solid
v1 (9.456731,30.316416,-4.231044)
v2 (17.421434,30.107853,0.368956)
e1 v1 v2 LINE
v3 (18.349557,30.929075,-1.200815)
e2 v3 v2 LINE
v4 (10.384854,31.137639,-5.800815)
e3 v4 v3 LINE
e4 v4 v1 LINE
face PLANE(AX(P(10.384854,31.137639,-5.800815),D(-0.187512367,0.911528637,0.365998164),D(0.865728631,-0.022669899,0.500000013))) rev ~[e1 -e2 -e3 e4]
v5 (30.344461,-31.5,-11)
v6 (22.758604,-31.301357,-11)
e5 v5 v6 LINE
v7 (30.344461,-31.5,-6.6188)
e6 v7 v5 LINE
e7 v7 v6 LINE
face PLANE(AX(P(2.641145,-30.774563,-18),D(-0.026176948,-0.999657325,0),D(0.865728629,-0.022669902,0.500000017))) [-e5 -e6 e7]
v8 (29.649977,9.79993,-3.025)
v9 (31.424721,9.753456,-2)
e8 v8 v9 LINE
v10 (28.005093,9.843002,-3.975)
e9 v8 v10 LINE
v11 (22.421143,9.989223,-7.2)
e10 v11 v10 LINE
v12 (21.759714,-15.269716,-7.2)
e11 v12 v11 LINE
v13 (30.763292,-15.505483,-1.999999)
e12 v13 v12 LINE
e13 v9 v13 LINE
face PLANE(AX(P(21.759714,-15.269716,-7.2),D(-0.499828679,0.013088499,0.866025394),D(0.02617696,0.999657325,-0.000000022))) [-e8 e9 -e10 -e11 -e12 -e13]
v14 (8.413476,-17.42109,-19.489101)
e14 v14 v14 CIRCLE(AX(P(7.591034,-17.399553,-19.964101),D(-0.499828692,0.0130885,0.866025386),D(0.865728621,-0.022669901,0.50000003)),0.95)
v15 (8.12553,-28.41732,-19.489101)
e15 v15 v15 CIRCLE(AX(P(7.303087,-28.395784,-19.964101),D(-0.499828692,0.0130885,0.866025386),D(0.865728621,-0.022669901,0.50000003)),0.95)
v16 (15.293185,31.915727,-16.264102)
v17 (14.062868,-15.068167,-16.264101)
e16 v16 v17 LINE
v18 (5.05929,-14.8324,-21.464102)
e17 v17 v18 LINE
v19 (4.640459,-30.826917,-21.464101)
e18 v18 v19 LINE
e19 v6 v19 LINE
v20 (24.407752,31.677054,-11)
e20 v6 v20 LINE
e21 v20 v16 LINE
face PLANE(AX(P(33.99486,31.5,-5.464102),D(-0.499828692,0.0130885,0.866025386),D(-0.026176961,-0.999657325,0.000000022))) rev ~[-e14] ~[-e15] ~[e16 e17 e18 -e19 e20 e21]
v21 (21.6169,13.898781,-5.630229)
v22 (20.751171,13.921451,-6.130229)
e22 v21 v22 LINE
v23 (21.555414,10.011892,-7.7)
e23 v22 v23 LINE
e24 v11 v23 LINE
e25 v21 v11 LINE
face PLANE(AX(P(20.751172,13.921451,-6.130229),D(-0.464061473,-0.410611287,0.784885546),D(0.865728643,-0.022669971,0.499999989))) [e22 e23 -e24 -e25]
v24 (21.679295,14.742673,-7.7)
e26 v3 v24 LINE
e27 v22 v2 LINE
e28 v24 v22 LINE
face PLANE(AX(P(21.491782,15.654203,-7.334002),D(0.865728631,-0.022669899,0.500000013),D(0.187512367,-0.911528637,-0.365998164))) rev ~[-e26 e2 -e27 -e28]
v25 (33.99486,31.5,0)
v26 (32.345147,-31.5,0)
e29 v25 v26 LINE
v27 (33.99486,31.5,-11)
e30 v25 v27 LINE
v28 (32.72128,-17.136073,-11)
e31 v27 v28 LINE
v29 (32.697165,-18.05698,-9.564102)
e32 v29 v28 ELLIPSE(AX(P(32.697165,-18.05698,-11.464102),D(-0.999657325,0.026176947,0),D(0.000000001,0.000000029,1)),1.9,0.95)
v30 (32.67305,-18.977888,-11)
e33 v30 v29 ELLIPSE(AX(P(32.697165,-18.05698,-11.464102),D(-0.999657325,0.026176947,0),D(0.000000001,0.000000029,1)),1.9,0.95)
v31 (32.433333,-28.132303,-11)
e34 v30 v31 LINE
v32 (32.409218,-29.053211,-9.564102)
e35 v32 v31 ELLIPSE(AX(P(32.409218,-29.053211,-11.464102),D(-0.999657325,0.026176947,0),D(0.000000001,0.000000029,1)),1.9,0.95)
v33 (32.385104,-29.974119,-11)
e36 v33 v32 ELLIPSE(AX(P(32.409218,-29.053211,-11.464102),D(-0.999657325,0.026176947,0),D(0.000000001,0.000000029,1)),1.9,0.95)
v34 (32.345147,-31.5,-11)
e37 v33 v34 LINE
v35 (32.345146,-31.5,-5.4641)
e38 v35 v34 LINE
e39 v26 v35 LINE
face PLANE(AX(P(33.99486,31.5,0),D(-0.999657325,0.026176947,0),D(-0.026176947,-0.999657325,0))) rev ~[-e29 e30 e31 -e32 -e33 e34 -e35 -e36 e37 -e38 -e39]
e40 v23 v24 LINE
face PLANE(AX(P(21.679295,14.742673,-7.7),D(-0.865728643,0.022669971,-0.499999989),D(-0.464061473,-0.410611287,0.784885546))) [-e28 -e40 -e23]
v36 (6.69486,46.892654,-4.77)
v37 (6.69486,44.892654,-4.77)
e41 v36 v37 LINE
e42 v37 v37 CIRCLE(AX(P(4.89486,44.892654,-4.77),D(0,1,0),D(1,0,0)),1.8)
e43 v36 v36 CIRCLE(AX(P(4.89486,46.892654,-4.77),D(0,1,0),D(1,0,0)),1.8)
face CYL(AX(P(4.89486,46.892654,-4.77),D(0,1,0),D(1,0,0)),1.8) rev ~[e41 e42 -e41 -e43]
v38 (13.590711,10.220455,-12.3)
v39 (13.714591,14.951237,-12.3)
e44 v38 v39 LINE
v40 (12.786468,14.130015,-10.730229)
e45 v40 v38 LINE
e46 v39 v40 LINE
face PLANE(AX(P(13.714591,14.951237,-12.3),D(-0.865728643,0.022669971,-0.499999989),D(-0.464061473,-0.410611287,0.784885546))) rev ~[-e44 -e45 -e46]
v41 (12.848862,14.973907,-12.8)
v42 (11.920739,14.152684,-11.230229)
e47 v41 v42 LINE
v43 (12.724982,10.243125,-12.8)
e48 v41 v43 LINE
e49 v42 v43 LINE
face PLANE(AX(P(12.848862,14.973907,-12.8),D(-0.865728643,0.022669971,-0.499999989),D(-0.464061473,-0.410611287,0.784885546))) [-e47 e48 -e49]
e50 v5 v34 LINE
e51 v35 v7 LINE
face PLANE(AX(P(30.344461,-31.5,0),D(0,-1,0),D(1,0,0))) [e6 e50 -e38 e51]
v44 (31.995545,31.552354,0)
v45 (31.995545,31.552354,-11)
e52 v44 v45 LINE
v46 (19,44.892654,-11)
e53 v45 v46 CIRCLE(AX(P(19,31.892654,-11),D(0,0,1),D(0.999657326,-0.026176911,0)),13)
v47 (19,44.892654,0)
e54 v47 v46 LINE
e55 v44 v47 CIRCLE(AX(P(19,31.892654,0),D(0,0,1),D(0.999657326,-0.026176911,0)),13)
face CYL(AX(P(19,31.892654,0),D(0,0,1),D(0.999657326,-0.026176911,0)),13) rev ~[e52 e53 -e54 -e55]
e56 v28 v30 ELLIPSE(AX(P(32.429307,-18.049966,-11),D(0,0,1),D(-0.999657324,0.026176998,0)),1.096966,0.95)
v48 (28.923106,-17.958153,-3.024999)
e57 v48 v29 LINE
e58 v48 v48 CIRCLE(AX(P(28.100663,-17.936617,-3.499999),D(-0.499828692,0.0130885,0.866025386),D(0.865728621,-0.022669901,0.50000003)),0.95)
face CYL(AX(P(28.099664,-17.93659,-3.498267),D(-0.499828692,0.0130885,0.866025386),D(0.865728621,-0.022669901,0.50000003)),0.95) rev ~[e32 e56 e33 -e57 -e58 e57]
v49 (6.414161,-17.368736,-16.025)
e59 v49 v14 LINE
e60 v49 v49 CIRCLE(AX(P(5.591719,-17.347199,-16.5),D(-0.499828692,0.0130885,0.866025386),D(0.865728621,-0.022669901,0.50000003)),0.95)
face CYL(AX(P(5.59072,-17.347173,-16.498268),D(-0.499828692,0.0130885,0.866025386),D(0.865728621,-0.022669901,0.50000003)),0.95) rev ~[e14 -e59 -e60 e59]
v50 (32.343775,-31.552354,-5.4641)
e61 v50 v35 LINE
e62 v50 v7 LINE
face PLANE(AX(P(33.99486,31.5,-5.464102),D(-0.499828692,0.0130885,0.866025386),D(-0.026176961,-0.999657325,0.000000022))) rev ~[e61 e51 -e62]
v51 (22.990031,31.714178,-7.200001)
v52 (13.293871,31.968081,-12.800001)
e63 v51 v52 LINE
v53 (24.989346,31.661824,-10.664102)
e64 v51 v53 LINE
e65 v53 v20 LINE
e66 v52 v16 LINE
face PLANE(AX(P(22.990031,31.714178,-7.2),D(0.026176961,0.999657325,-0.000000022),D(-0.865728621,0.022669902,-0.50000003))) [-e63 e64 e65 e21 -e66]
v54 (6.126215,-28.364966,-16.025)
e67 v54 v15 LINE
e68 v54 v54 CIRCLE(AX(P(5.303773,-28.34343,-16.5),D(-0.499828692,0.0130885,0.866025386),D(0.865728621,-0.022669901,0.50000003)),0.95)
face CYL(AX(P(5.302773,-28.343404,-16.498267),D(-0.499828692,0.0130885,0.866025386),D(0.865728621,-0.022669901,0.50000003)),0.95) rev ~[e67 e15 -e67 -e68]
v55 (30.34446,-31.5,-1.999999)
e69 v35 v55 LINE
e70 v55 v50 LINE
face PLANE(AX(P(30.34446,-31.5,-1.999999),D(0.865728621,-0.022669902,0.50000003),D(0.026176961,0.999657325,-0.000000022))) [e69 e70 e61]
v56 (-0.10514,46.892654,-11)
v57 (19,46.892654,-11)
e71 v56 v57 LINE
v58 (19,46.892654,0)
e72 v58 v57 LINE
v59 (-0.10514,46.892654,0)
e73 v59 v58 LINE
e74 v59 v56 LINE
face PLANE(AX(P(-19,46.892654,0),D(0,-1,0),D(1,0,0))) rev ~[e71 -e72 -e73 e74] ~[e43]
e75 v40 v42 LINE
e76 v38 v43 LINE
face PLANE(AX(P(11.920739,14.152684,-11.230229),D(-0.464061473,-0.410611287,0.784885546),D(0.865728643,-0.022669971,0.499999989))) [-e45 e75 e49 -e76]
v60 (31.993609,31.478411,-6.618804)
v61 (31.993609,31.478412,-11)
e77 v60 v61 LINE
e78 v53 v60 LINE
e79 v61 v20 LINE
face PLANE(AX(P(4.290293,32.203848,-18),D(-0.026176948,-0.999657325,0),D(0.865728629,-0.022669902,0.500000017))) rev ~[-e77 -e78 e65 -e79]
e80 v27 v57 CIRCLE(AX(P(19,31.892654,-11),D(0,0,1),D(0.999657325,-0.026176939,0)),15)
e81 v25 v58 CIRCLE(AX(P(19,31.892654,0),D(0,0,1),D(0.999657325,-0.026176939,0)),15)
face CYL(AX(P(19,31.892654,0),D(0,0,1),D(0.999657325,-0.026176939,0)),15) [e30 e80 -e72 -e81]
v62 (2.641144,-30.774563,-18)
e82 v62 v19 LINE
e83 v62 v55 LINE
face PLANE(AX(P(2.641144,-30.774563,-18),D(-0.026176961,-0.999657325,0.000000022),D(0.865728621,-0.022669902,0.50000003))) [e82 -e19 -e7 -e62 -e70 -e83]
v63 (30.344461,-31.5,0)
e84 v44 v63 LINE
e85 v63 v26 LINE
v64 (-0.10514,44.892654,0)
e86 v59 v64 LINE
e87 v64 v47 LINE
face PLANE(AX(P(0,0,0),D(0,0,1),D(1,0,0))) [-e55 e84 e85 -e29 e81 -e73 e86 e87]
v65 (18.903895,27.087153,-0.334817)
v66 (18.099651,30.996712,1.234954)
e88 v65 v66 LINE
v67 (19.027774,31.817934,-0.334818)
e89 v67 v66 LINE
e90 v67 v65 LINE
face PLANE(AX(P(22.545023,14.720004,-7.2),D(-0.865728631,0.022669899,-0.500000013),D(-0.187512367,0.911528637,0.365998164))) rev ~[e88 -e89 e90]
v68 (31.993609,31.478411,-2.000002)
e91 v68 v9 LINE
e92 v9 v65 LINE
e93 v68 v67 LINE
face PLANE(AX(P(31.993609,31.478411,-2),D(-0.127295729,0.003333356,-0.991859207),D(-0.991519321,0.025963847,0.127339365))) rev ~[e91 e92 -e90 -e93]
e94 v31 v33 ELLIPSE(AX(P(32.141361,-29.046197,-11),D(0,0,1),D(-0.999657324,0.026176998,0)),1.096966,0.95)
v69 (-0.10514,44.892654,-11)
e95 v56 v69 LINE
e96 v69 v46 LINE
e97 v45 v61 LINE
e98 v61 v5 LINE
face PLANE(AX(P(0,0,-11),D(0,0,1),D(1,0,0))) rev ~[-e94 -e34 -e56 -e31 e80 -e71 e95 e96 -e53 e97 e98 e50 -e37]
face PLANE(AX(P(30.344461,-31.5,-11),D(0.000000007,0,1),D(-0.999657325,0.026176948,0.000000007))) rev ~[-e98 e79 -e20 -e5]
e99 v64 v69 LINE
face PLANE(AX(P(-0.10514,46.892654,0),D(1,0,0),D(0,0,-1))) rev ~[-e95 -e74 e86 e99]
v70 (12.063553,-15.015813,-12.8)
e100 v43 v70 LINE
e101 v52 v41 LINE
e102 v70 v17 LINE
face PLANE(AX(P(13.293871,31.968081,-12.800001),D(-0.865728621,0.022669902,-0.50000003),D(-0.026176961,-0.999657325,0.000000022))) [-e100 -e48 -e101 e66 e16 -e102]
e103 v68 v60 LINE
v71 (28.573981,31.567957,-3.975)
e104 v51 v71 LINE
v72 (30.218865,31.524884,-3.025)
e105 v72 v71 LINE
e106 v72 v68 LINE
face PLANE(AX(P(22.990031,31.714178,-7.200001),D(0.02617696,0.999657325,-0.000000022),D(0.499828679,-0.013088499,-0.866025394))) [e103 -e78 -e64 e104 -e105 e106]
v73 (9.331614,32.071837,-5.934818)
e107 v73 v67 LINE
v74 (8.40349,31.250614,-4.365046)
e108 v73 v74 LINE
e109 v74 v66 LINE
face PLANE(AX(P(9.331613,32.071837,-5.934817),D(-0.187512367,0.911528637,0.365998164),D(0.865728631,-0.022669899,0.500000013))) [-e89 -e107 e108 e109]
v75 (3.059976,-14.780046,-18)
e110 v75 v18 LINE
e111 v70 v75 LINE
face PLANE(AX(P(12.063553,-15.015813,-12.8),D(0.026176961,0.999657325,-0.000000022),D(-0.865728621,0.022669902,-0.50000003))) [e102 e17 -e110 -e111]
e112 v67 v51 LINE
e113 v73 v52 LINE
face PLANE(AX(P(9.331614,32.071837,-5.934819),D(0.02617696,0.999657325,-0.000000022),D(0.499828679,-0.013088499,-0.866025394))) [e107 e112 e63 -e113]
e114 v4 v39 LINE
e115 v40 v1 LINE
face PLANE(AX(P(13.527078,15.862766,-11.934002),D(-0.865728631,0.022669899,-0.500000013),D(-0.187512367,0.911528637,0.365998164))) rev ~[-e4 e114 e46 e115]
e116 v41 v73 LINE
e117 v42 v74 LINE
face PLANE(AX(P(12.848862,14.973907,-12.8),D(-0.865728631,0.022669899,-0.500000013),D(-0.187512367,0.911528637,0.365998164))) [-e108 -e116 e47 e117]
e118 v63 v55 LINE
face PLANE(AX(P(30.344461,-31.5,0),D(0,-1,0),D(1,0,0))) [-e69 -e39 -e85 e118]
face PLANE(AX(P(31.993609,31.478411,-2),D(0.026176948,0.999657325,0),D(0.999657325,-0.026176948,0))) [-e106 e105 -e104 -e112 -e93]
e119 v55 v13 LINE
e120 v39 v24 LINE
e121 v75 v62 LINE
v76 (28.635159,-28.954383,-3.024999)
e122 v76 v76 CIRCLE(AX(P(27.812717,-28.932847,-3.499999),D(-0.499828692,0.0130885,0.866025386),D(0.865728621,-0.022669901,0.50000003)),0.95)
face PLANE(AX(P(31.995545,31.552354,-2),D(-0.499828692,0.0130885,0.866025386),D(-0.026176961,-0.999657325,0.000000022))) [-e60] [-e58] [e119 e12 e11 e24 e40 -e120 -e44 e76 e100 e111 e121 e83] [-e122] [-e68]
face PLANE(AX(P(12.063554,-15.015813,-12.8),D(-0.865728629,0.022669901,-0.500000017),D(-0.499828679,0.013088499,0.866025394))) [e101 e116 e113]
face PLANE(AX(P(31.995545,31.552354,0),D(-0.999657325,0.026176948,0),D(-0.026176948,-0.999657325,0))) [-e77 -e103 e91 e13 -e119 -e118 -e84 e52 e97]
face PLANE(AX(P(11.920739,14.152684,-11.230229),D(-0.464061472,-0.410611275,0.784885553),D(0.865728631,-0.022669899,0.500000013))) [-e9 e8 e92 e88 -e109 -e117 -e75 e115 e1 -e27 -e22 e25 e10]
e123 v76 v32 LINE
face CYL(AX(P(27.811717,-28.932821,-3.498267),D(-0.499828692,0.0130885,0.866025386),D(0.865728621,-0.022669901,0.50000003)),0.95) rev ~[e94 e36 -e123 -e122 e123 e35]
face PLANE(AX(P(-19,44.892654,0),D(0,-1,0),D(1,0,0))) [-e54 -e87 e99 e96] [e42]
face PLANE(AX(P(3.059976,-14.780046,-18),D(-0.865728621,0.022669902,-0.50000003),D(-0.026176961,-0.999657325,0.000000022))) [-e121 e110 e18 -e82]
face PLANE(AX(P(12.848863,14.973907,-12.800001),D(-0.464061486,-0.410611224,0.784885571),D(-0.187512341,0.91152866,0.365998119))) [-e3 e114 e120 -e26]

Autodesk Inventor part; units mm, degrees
ref_plane "YZ Plane" through (0, 0, 0) normal (1, 0, 0) x (0, 1, 0)
ref_plane "XZ Plane" through (0, 0, 0) normal (0, 1, 0) x (-1, 0, 0)
sketch "Sketch1" plane through (0, 0, 0) normal (0, 0, 1) x (1, 0, 0)
  line L0 (-19, 46.892654) -> (19, 46.892654)
  line L1 (33.99486, 31.5) -> (32.345147, -31.5)
  arc A0 (33.99486, 31.5) -> (19, 46.892654) centre (19, 31.892654) ccw
  line L2 (-19, 44.892654) -> (19, 44.892654)
  arc A1 (31.995545, 31.552354) -> (19, 44.892654) centre (19, 31.892654) ccw
  line L3 (31.995545, 31.552354) -> (30.344461, -31.5)
  line L4 (-19, 46.892654) -> (-19, 44.892654)
  line L5 (30.344461, -31.5) -> (32.345147, -31.5)
  point P0 (0, 0)
  point P1 (33.170003, 0)
  point P2 (0, 46.892654)
  dimension "d0" = 88.5
  dimension "d1" = 15
  dimension "d2" = 38
  dimension "d3" = 63
  dimension "d4" = 2
extrude "Extrusion1" add sketch "Sketch1" against normal blind 11
sketch "Sketch3" plane through (-19, 44.892654, 0) normal (0, -1, 0) x (1, 0, 0)
  line L0 (0, 0) -> (13, 0)
  line L1 (13, 0) -> (13, -14.7)
  line L2 (13, -14.7) -> (0, -14.7)
  line L3 (0, -14.7) -> (0, 0)
  line L4 (0, 0) -> (38, 0) projected
  line L5 (0, 0) -> (0, -11) projected
  point P0 (19, 0)
  dimension "d7" = 13
  dimension "d8" = 14.7
extrude "Extrusion2" [suppressed]
extrude "Extrusion3" [suppressed]
sketch "Sketch5" plane through (-19, 42.692654, 0) normal (0, -1, 0) x (1, 0, 0)
  line L0 (0, 0) -> (6.5, 0) construction
  line L1 (6.5, 0) -> (6.5, -4.77) construction
  line L2 (6.5, -4.77) -> (0, -4.77) construction
  line L3 (0, -4.77) -> (0, 0) construction
  line L4 (13, 0) -> (0, 0) construction
  line L5 (0, 0) -> (0, -14.7) construction
  circle A0 centre (6.5, -4.77) radius 1.8
  circle A1 centre (6.5, -4.77) radius 3.5
  point P0 (19, 0)
  dimension "d15" = 4.77
  dimension "d16" = 6.5
  dimension "d17" = 3.6
  dimension "d18" = 7
extrude "Extrusion7" [suppressed]
extrude "Extrusion8" [suppressed]
sketch "Sketch7" plane through (-19, 42.692654, 0) normal (-1, 0, 0) x (0, 0, 1)
  line L0 (-6.57, 3) -> (-2.97, 3) projected
  line L1 (-6.57, 5.2) -> (-2.97, 5.2) projected
  line L2 (-6.57, 5.2) -> (-12.7, 5.2)
  line L3 (-12.7, 5.2) -> (-12.7, 1.7)
  line L4 (-12.7, 1.7) -> (-6.57, 1.7)
  line L5 (-6.57, 1.7) -> (-6.57, 5.2)
  line L6 (0, 5.2) -> (-14.7, 5.2) projected
  line L7 (-14.7, 5.2) -> (-14.7, 0) projected
  point P0 (0, -42.692654)
  point P1 (-12.7, 3.45)
  dimension "d31" = 3.5
  dimension "d32" = 2
extrude "Extrusion9" [suppressed]
sketch "Sketch8" plane through (-19, 46.892654, 0) normal (0, 1, 0) x (1, 0, 0)
  line L0 (38, 11) -> (0, 11) projected
  line L1 (13, 11) -> (18, 11)
  line L2 (18, 11) -> (18, 6.57)
  line L3 (18, 6.57) -> (13, 6.57)
  line L4 (13, 6.57) -> (13, 11)
  line L5 (13, 6.57) -> (6.5, 6.57) projected
  point P0 (19, 0)
  dimension "d35" = 5
extrude "Extrusion10" [suppressed]
chamfer "Chamfer1" [suppressed]
sketch "Sketch9" plane through (31.995545, 31.552354, -11) normal (-0.9996573, 0.0261769, 0) x (0, 0, 1)
  line L0 (9, 0) -> (9, -63.073968)
  line L1 (11, -63.073968) -> (0, -63.073968)
  line L2 (11, 0) -> (0, 0)
  line L3 (11, 0) -> (11, -63.073968)
  point P0 (11, -32.379087)
  dimension "d41" = 2
ref_plane "Work Plane1" through (31.995545, 31.552354, -2) normal (-0.4998287, 0.0130885, 0.8660254) x (-0.0261769, -0.9996573, 0)
sketch "Sketch10" plane through (31.995545, 31.552354, -2) normal (-0.4998287, 0.0130885, 0.8660254) x (-0.0261769, -0.9996573, 0)
  line L0 (47.073968, -32) -> (63.073968, -32)
  line L1 (63.073968, -32) -> (63.073968, 0)
  line L2 (63.073968, 0) -> (47.073968, 0)
  line L3 (47.073968, 0) -> (47.073968, -32)
  line L4 (63.073968, 1) -> (63.073968, -4.5)
  line L5 (0, 1) -> (63.073968, 1)
  line L6 (0, 1) -> (0, -4.5)
  line L7 (63.073968, -4.5) -> (0, -4.5)
  line L8 (63.073968, 1) -> (63.073968, -4.5)
  line L9 (0, 0) -> (63.073968, 0)
  line L10 (0.073968, -21.6) -> (47.073968, -21.6)
  line L11 (47.073968, -21.6) -> (47.073968, -10.4)
  line L12 (47.073968, -10.4) -> (0.073968, -10.4)
  line L13 (0.073968, -10.4) -> (0.073968, -21.6)
  point P0 (32.379087, -25.984171)
  point P1 (47.073968, -16)
  point P2 (47.073968, -16)
  point P3 (47.073968, -4.5)
  dimension "d43" = 32
  dimension "d44" = 16
  dimension "d45" = 11.2
  dimension "d46" = 47
extrude "Extrusion11" add sketch "Sketch10" against normal blind 4 contours L3 L7 L1 L0 | L10 L13 L12 L3 | L7 L3 L2 L1
sketch "Sketch12" plane through (23.759029, -15.32207, -10.664102) normal (0.8657286, -0.0226699, 0.5) x (0.4998287, -0.0130885, -0.8660254)
  line L0 (-4, 0) -> (-4, 47)
  line L1 (-4, 0) -> (0, 0)
  line L2 (0, 47) -> (0, 0)
  line L3 (-4, 47) -> (0, 47)
  line L4 (-4, 38.228587) -> (-4, 47)
  point P0 (-21.311369, 14.69488)
extrude "Extrusion13" add sketch "Sketch12" along normal up to surface surface through (33.99486, 31.5, 0) normal (0.9996573, -0.0261769, 0)
sketch "Sketch15" plane through (2.641145, -30.774563, -18) normal (-0.0261769, -0.9996573, 0) x (0.8657286, -0.0226699, 0.5)
  line L0 (29.690599, -4) -> (27.5, -7.794229)
  line L1 (27.5, -7.794229) -> (20.928203, -4)
  line L2 (10.4, -4) -> (29.690599, -4)
  line L3 (21.446961, 8.402201) -> (33, 1.732051)
  line L4 (21.446961, 8.402201) -> (15.946961, -1.124078)
  line L5 (27.5, -7.794229) -> (15.946961, -1.124078)
  line L6 (33, 1.732051) -> (27.5, -7.794229)
  point P0 (6.015829, 17.311369)
extrude "Extrusion16" add sketch "Sketch15" against normal up to surface (63 mm away) contours L0 L1 L2
sketch "Sketch14" plane through (31.995545, 31.552354, -2) normal (-0.4998287, 0.0130885, 0.8660254) x (0.8657286, -0.0226699, 0.5)
  line L0 (-29, -49.573968) -> (-3, -49.573968) construction
  line L1 (-3, -49.573968) -> (-3, -60.573968) construction
  line L2 (-3, -60.573968) -> (-29, -60.573968) construction
  line L3 (-29, -60.573968) -> (-29, -49.573968) construction
  line L4 (-21.6, -0.073968) -> (-21.6, -47.073968) construction
  line L5 (-21.6, -47.073968) -> (-32, -47.073968) construction
  line L6 (-32, -47.073968) -> (-32, -63.073968) construction
  line L7 (-32, -63.073968) -> (0, -63.073968) construction
  line L8 (0, -0.073968) -> (0, -63.073968) construction
  circle A0 centre (-29, -49.573968) radius 0.95
  circle A1 centre (-29, -60.573968) radius 0.95
  circle A2 centre (-3, -60.573968) radius 0.95
  circle A3 centre (-3, -49.573968) radius 0.95
  line L9 (0, -0.073968) -> (-21.6, -0.073968)
  point P0 (-25.984171, -32.379087)
  point P1 (-16, -63.073968)
  point P2 (-16, -60.573968)
  point P3 (-29, -55.073968)
  point P4 (-32, -55.073968)
  dimension "d58" = 26
  dimension "d59" = 11
  dimension "d60" = 1.9
extrude "Extrusion15" cut sketch "Sketch14" against normal blind 20
sketch "Sketch17" plane through (12.063554, -15.015813, -12.8) normal (-0.8657286, 0.0226699, -0.5) x (-0.4998287, 0.0130885, 0.8660254)
  line L0 (0, 47) -> (0, 0)
  line L1 (0, 30) -> (7.92723, 47)
  line L2 (7.92723, 47) -> (0, 47)
  point P0 (17.311369, 14.69488)
  dimension "d67" = 17
  dimension "d68" = 25
extrude "Extrusion17" add sketch "Sketch17" against normal up to surface (11.2 mm away)
sketch "Sketch19" plane through (12.848862, 14.973907, -12.8) normal (-0.4640615, -0.4106113, 0.7848856) x (0.8657286, -0.0226699, 0.5)
  line L0 (11.2, 0) -> (11.2, 18.757425)
  line L1 (0, 18.757425) -> (11.2, 18.757425)
  line L2 (0, 0) -> (0, 18.757425)
  line L3 (11.2, 0) -> (0, 0)
  line L4 (1, 1) -> (1, 17.757425)
  line L5 (1, 17.757425) -> (10.2, 17.757425)
  line L6 (10.2, 17.757425) -> (10.2, 1)
  line L7 (10.2, 1) -> (1, 1)
  line L8 (1, 1) -> (1, 0)
  line L9 (10.2, 1) -> (10.2, 0)
  point P0 (-4.384171, -6.555048)
  dimension "d71" = 1
  dimension "d72" = 9.2
extrude "Extrusion18" add sketch "Sketch19" along normal blind 2 contours L3 L9 L6 L5 L4 L8 L2 L1 L0
sketch "Sketch20" plane through (13.714591, 14.951237, -12.3) normal (0.1875123, -0.9115286, -0.3659982) x (0.8657286, -0.0226699, 0.5)
  line L0 (10.2, 0) -> (9.2, 0) projected
  line L1 (10.2, 0) -> (10.2, 2) projected
  line L2 (9.2, 2) -> (10.2, 2) projected
  line L3 (9.2, 0) -> (9.2, 2) projected
  line L4 (0, 0) -> (-1, 0) projected
  line L5 (0, 0) -> (0, 2) projected
  line L6 (-1, 2) -> (0, 2) projected
  line L7 (-1, 0) -> (-1, 2) projected
  point P0 (-5.384171, 22.157652)
extrude "Extrusion19" add sketch "Sketch20" along normal up to surface surface through (14.907242, 0.281044, -11.389944) normal (-0.4998287, 0.0130885, 0.8660254)
sketch "Sketch21" plane through (-19, 46.892654, 0) normal (0, 1, 0) x (1, 0, 0)
  line L0 (52.99486, 0) -> (52.99486, 11)
  circle A0 centre (23.89486, 4.77) radius 1.8
  line L1 (38, 0) -> (0, 0)
  line L2 (38, 0) -> (0, 0)
  line L3 (38, 0) -> (38, 11)
  line L4 (0, 11) -> (38, 11)
  line L5 (0, 0) -> (0, 11)
  line L6 (18.89486, 0) -> (18.89486, 11)
  point P0 (19, 0)
  dimension "d77" = 29.1
  dimension "d78" = 3.6
  dimension "d79" = 4.77
  dimension "d80" = 5
extrude "Extrusion20" cut sketch "Sketch21" against normal up to surface (2 mm away) contours A0 | L1 L5 L4 L6
sketch "Sketch24" plane through (31.993609, 31.478411, -2) normal (0.0261769, 0.9996573, 0) x (0.9996573, -0.0261769, 0)
  line L0 (-12.970279, -1.665183) -> (-9.006664, 5.2)
  line L1 (-1.775352, 1.025) -> (-3.4208, 1.975)
  line L2 (-1.775352, 1.025) -> (-3.4208, 1.975)
  line L3 (-27.712813, 16) -> (0, 0)
  line L4 (0, 0) -> (-9.006664, 5.2)
  line L5 (0, 0) -> (-12.970279, -1.665183)
  line L6 (-9.87269, 5.7) -> (-17.840123, 10.3)
  line L7 (-12.970279, -1.665183) -> (-13.876587, -3.234954)
  line L8 (-13.876587, -3.234954) -> (-9.006664, 5.2)
  line L9 (-17.840123, 10.3) -> (-18.706149, 10.8)
  line L10 (-9.006664, 5.2) -> (-9.87269, 5.7)
  line L11 (-18.706149, 10.8) -> (-27.712813, 16)
  point P0 (-31.158637, -2)
  point P1 (-21.487547, 18.030192)
  point P2 (-22.943031, 19.251489)
  point P3 (-21.487547, 18.030192)
  point P4 (-22.943031, 19.251489)
  point P5 (0, 0)
  point P6 (-1.775352, 1.025)
  point P7 (-3.4208, 1.975)
  point P8 (-9.006664, 5.2)
extrude "Extrusion22" add sketch "Sketch24" against normal up to surface surface through (15.010195, 22.574698, -4.997638) normal (-0.4640615, -0.4106113, 0.7848856)
equation "\"d68\" = zangle"
equation "\"yangle\" = 30deg"
equation "\"zangle\" = 25deg"
equation "\"d42\" = yangle"
properties part number "3DOCameraMount_3DPrint"
